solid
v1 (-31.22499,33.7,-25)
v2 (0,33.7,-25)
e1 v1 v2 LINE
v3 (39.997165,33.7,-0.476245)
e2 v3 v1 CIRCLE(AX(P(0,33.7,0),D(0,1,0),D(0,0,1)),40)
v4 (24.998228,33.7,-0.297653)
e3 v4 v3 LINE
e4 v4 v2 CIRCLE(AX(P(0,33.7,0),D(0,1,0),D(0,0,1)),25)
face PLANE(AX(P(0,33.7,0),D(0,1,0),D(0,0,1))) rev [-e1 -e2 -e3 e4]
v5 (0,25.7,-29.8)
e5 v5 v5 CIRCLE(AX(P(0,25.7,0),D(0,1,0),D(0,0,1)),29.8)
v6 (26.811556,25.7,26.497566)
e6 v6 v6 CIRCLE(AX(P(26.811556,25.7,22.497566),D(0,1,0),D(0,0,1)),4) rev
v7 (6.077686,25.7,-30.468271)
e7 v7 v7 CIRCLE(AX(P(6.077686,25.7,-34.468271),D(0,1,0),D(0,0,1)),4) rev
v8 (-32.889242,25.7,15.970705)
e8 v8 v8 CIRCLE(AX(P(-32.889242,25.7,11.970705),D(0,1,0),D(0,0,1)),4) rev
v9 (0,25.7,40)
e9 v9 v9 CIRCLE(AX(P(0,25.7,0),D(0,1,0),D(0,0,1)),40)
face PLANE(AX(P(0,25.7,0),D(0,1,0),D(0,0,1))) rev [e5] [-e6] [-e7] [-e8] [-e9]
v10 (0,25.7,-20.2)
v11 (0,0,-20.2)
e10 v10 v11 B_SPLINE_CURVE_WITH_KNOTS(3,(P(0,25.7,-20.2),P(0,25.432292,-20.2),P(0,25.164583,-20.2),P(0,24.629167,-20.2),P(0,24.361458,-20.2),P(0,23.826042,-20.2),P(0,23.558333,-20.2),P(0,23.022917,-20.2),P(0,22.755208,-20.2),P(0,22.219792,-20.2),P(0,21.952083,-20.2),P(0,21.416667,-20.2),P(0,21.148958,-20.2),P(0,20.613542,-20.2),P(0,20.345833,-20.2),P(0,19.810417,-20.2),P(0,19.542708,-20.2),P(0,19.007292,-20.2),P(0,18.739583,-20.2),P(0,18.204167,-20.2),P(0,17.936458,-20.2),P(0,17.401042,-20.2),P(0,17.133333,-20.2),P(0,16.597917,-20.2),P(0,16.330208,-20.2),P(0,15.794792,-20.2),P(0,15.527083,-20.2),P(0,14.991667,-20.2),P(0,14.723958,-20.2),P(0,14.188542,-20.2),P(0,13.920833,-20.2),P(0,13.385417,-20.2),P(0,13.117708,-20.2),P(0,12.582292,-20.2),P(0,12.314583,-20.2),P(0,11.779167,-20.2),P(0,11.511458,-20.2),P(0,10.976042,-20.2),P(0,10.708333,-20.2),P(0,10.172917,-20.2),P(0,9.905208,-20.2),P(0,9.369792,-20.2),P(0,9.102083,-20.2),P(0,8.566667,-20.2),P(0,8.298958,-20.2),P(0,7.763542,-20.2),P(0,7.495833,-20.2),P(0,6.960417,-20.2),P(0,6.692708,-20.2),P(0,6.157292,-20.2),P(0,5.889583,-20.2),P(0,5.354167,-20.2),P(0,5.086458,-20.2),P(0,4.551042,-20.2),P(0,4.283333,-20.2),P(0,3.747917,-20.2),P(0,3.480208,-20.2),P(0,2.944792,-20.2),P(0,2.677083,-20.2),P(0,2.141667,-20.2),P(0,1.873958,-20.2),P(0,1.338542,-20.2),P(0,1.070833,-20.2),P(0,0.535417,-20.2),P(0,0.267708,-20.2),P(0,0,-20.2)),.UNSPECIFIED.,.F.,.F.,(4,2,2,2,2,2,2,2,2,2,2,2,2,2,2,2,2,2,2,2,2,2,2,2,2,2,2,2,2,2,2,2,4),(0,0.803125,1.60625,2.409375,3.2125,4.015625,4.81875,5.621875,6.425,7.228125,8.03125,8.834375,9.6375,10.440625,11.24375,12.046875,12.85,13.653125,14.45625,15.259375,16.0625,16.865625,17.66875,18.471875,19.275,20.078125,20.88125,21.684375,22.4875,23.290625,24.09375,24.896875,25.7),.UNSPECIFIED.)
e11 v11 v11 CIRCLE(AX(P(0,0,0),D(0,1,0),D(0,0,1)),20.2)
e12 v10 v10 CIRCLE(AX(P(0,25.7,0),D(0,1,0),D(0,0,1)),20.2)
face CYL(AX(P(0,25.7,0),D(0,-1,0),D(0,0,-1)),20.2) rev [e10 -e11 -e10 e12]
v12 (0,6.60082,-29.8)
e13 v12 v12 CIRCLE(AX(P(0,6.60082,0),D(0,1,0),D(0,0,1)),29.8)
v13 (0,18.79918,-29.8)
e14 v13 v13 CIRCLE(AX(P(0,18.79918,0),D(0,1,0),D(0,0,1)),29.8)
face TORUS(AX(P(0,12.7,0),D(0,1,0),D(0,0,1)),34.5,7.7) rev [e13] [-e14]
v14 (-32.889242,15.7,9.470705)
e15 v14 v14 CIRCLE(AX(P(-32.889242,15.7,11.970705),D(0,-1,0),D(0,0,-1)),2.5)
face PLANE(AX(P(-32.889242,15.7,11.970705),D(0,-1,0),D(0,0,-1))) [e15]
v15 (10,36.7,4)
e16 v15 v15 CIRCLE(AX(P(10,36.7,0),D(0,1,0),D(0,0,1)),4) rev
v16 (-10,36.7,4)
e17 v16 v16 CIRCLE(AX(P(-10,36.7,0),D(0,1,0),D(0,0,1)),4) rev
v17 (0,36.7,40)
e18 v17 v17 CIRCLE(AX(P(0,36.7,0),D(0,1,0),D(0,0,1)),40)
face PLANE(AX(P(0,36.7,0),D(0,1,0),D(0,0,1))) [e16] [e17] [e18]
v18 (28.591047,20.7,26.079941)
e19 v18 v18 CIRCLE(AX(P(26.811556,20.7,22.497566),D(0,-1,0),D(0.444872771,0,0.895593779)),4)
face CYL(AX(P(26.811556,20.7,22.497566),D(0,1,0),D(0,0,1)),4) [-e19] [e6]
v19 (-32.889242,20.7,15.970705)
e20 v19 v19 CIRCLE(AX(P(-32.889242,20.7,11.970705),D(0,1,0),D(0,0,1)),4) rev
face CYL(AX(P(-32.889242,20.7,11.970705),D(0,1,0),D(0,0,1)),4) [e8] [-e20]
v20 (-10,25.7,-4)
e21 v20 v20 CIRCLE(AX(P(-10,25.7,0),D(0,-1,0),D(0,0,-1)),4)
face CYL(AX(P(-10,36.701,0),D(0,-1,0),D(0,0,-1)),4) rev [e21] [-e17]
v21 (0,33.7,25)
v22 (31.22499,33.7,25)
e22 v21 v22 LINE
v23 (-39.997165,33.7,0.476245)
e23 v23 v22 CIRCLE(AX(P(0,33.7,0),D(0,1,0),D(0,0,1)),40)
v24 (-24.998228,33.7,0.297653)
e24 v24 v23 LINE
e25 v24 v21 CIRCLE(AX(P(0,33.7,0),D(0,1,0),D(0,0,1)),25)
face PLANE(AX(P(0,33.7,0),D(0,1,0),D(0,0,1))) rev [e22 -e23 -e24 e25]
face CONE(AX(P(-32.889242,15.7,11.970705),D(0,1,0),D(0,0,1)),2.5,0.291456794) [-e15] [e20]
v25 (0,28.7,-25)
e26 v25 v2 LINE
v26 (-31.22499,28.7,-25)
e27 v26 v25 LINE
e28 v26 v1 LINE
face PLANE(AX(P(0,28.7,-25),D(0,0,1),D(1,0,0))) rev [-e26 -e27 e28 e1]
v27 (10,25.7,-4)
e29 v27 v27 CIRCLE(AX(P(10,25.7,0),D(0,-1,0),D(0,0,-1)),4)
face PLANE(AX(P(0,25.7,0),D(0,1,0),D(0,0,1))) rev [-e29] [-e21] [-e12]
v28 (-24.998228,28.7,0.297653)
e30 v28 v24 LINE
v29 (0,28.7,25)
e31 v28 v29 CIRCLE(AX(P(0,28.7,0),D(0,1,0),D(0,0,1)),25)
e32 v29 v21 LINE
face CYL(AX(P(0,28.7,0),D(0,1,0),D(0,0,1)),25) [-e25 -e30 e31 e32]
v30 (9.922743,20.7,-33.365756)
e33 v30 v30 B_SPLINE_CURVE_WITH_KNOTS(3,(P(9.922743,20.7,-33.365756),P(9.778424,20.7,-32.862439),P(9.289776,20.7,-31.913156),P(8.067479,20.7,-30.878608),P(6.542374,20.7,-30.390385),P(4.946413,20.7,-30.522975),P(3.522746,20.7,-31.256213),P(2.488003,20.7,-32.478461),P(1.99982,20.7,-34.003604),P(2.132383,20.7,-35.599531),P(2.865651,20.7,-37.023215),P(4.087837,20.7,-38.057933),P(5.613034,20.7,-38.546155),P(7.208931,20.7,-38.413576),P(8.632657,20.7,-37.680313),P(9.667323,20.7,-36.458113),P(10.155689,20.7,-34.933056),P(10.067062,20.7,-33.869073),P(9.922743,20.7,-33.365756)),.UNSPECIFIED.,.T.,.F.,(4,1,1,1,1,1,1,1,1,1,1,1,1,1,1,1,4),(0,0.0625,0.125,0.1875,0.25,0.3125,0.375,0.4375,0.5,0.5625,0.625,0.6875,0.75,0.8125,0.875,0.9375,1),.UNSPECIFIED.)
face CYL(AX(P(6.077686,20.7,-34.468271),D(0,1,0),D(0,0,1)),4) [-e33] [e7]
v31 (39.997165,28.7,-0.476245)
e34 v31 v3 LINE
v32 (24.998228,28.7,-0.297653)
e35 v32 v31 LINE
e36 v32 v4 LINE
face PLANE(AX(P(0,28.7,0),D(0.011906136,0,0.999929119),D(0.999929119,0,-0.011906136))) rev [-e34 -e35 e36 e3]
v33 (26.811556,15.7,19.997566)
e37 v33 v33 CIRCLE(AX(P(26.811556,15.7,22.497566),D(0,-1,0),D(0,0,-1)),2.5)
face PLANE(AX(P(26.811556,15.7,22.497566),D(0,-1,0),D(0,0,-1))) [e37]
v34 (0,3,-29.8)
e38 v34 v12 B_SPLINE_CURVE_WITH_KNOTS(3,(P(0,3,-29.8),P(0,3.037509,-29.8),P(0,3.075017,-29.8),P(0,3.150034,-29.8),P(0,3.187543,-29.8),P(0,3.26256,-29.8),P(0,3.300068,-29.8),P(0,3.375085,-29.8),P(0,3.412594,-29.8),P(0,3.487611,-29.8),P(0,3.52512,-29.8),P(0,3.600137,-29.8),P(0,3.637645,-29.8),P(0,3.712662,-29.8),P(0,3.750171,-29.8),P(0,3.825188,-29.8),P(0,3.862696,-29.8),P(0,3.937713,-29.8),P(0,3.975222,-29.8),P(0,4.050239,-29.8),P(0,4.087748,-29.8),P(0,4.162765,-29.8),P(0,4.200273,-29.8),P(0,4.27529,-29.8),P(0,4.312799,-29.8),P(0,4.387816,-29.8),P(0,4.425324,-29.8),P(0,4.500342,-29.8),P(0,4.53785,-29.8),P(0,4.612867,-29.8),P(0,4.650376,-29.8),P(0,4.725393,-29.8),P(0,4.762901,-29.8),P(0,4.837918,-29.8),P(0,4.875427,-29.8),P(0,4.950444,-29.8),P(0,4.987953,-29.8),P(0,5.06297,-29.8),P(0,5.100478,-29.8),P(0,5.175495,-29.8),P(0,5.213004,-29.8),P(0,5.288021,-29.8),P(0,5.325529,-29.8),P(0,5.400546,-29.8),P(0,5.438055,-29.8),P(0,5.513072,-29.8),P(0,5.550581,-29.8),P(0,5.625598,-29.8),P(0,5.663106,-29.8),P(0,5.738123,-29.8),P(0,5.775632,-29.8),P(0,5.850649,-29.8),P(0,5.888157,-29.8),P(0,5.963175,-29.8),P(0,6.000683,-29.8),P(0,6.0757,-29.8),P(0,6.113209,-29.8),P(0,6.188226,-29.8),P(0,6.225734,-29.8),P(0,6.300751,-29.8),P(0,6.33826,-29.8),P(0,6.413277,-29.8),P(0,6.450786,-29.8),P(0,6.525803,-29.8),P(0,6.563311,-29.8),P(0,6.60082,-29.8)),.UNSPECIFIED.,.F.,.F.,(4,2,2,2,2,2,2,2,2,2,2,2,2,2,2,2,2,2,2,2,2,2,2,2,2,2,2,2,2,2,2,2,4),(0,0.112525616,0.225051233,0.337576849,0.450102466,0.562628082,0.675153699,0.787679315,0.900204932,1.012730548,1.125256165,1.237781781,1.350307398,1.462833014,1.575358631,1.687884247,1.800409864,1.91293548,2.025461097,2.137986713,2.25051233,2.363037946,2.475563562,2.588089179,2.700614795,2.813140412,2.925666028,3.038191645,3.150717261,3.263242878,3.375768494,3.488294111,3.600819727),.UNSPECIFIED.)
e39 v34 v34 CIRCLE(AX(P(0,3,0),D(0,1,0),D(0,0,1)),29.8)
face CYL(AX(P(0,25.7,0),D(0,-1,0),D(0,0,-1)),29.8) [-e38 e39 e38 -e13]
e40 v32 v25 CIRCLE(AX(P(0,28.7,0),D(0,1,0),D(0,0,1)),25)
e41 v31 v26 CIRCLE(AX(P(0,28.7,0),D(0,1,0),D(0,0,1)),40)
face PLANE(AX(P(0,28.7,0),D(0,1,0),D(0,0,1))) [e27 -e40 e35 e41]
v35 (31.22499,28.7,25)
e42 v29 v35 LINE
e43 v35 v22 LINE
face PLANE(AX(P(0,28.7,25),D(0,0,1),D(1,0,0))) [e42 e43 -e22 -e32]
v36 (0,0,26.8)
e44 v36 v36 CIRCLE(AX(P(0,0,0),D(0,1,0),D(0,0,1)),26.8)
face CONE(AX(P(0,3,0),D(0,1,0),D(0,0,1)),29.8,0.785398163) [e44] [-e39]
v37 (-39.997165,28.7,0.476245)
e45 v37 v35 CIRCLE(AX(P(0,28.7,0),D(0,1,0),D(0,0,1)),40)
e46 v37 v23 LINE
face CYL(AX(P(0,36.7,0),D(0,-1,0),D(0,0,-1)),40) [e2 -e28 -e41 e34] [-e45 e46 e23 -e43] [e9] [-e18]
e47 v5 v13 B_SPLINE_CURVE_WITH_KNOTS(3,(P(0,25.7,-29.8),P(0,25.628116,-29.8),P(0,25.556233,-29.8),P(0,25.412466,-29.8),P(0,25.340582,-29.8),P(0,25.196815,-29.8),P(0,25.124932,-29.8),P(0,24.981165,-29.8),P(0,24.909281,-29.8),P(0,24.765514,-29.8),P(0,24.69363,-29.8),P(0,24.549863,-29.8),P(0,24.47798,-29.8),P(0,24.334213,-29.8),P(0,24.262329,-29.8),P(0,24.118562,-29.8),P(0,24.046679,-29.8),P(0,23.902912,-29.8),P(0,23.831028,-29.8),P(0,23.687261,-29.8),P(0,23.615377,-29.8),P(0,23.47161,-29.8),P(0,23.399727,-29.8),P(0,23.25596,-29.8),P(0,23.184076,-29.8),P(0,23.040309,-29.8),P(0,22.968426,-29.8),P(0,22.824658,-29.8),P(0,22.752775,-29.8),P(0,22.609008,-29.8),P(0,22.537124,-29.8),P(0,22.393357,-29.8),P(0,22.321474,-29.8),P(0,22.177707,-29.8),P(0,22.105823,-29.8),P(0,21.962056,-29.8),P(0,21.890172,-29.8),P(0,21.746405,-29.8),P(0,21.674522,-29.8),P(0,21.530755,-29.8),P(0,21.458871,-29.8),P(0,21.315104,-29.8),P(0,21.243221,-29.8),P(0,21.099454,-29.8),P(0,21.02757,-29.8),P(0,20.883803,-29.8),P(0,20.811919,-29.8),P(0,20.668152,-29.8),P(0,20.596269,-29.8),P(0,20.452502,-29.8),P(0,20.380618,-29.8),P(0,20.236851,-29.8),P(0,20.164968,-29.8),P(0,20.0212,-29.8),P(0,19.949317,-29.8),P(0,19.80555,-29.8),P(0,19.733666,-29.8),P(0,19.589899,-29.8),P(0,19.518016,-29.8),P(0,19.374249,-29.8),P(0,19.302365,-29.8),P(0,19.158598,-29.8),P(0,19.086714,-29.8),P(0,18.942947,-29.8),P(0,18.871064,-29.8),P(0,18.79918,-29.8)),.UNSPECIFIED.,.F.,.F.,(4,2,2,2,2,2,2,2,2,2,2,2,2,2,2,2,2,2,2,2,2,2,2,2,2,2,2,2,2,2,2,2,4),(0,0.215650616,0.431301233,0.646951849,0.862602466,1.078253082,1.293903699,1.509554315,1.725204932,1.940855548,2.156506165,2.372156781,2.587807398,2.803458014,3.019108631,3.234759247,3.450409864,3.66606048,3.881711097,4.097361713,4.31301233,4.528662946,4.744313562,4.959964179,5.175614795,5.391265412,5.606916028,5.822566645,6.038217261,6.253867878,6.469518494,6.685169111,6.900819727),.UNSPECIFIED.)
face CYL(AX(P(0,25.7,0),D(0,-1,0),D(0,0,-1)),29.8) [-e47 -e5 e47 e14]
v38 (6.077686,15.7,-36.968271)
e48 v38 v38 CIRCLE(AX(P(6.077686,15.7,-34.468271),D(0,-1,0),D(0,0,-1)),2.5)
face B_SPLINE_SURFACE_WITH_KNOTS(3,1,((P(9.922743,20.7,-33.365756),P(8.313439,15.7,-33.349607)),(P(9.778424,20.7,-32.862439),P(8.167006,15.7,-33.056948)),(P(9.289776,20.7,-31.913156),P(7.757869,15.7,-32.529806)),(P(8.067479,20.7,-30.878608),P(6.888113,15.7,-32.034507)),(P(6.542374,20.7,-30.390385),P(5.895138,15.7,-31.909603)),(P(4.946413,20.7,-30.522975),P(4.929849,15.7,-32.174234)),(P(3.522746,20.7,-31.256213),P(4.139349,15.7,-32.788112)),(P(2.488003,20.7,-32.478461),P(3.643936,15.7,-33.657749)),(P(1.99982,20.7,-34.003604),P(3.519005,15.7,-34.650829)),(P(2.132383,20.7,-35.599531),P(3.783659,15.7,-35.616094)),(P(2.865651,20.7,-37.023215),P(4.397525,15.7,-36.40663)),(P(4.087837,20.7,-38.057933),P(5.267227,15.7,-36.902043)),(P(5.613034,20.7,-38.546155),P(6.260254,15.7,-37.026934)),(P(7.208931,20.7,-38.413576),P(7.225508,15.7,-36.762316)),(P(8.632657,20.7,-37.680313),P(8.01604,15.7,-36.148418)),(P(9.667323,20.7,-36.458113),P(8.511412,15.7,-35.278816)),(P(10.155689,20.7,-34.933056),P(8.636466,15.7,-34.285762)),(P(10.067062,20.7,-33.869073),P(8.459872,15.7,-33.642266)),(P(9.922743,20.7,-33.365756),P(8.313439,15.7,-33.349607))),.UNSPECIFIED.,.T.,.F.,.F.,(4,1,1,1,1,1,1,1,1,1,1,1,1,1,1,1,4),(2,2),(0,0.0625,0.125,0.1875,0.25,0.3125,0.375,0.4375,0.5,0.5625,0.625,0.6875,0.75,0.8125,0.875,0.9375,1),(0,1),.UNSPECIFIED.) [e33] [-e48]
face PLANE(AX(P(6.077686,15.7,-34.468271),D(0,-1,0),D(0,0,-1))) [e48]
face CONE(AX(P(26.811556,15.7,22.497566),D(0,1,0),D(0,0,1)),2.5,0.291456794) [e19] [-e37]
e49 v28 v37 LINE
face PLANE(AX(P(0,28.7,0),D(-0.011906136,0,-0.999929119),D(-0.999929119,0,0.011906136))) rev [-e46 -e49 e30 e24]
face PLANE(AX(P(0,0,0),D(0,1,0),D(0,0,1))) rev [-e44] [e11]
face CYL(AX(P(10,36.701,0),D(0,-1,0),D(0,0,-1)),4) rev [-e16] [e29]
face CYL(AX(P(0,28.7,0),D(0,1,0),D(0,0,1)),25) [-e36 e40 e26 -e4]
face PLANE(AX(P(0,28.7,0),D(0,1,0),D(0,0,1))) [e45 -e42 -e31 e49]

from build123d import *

# Parameters (mm, degrees)
SKETCH1_R           = 29.8
SKETCH1_R_2         = 20.2
BOSS_EXTRUDE1_DEPTH = 25.7
SKETCH3_R           = 40
BOSS_EXTRUDE2_DEPTH = 11
SKETCH4_R           = 4
BOSS_EXTRUDE3_DEPTH = 5
SKETCH6_R           = 2.5
CUT_EXTRUDE1_START  = -8
CUT_EXTRUDE1_DEPTH  = 5
CUT_EXTRUDE2_REACH  = 64.133
SKETCH8_R           = 4


with BuildPart() as part:
    # Sketch1 → Boss-Extrude1 (new body)
    with BuildSketch(Plane(origin=(0, 0, 0), x_dir=(1, 0, 0), z_dir=(0, 1, 0))):
        with Locations(Location((0, 0, 0), (0, 0, 90))):
            Circle(SKETCH1_R)
        with Locations(Location((0, 0, 0), (0, 0, 90))):
            Circle(SKETCH1_R_2, mode=Mode.SUBTRACT)
    extrude(amount=BOSS_EXTRUDE1_DEPTH)

    # Sketch2 → Cut-Revolve1 (revolve, cut)
    with BuildSketch(Plane.XY, mode=Mode.PRIVATE) as cut_revolve1_sk:
        with BuildLine():
            Line((29.8, 12.7), (29.8, 18.799180273))
            ThreePointArc((29.8, 18.799180273), (27.590586132, 16.098529094), (26.8, 12.7))
            Line((26.8, 12.7), (29.8, 12.7))
        make_face()
        with BuildLine():
            Line((29.8, 6.600819727), (29.8, 12.7))
            Line((29.8, 12.7), (26.8, 12.7))
            ThreePointArc((26.8, 12.7), (27.590586132, 9.301470906), (29.8, 6.600819727))
        make_face()
        Polygon((29.8, 3), (26.8, 0), (29.8, 0), align=None)
    revolve(cut_revolve1_sk.sketch.rotate(Axis((0, 25.7, 0), (0, -1, 0)), 270), axis=Axis((0, 25.7, 0), (0, -1, 0)), mode=Mode.SUBTRACT)

    # Sketch3 → Boss-Extrude2 (add)
    with BuildSketch(Plane(origin=(0, 25.7, 0), x_dir=(1, 0, 0), z_dir=(0, 1, 0))):
        with Locations(Location((0, 0, 0), (0, 0, 270))):
            Circle(SKETCH3_R)
    extrude(amount=BOSS_EXTRUDE2_DEPTH)

    # Sketch4 → Boss-Extrude3 (add)
    with BuildSketch(Plane(origin=(0, 25.7, 0), x_dir=(-1, 0, 0), z_dir=(0, -1, 0))):
        with Locations(Location((-26.811555509, -22.497566339, 0), (0, 0, 270))):
            Circle(SKETCH4_R)
        with Locations(Location((32.889241728, -11.970705016, 0), (0, 0, 270))):
            Circle(SKETCH4_R)
        with Locations(Location((-6.077686218, 34.468271355, 0), (0, 0, 270))):
            Circle(SKETCH4_R)
    extrude(amount=BOSS_EXTRUDE3_DEPTH)

    # Sketch6 → section 1 of loft1
    with BuildSketch(Plane(origin=(0, 15.7, 0), x_dir=(-1, 0, 0), z_dir=(0, -1, 0)), mode=Mode.PRIVATE) as loft1_s1:
        with Locations((32.889241728, -11.970705016)):
            Circle(SKETCH6_R)
    # loft from a face of the part (loft1)
    loft([part.faces().sort_by_distance((-32.889241728, 20.7, 11.970705016))[0], loft1_s1.sketch])

    # Boundary1: read off the stored shape, not the designer's step
    # Boundary1 outline → Boundary1 (revolve)
    with BuildSketch(Plane(origin=(26.811555509, 0, 22.497566339), x_dir=(1, 0, 0), z_dir=(0, 0, 1))):
        Polygon((0, 20.7), (0, 15.7), (2.5, 15.7), (4, 20.7), align=None)
    revolve(axis=Axis((26.811555509, 0, 22.497566339), (0, 1, 0)))

    # Boundary2: read off the stored shape, not the designer's step
    # Boundary2: loft between two sections, ruled curve by curve
    boundary2_from = [
        Edge.make_bspline([(9.922742778, 20.7, -33.365756026), (9.778423859, 20.7, -32.862439299), (9.289775651, 20.7, -31.913155977), (8.067478825, 20.7, -30.878607721), (6.542374051, 20.7, -30.390384874), (4.946413374, 20.7, -30.522974824), (3.522746317, 20.7, -31.256212676), (2.488002725, 20.7, -32.478460941), (1.999820352, 20.7, -34.003603594), (2.132382571, 20.7, -35.599531113), (2.865650923, 20.7, -37.023214684), (4.087837179, 20.7, -38.057933438), (5.613033755, 20.7, -38.546155237), (7.208931107, 20.7, -38.413575903), (8.632657493, 20.7, -37.680313497), (9.667322676, 20.7, -36.45811299), (10.155689167, 20.7, -34.933056337), (10.067061697, 20.7, -33.869072752), (9.922742778, 20.7, -33.365756026)], [0, 0, 0, 0, 0.0625, 0.125, 0.1875, 0.25, 0.3125, 0.375, 0.4375, 0.5, 0.5625, 0.625, 0.6875, 0.75, 0.8125, 0.875, 0.9375, 1, 1, 1, 1], 3),
    ]
    boundary2_to = [
        Edge.make_bspline([(8.313438837, 15.7, -33.349606871), (8.167005998, 15.7, -33.056947538), (7.757868808, 15.7, -32.529805617), (6.88811309, 15.7, -32.034506513), (5.895137902, 15.7, -31.909602819), (4.929849468, 15.7, -32.174234081), (4.139348951, 15.7, -32.788112293), (3.643935799, 15.7, -33.657748526), (3.519005287, 15.7, -34.650828768), (3.783658552, 15.7, -35.616093907), (4.397524642, 15.7, -36.406629525), (5.26722668, 15.7, -36.902042852), (6.260254151, 15.7, -37.026934051), (7.225507947, 15.7, -36.762316146), (8.016039922, 15.7, -36.14841822), (8.511411727, 15.7, -35.27881634), (8.63646584, 15.7, -34.285761617), (8.459871676, 15.7, -33.642266205), (8.313438837, 15.7, -33.349606871)], [0, 0, 0, 0, 0.0625, 0.125, 0.1875, 0.25, 0.3125, 0.375, 0.4375, 0.5, 0.5625, 0.625, 0.6875, 0.75, 0.8125, 0.875, 0.9375, 1, 1, 1, 1], 3),
    ]
    boundary2 = Solid(Shell([*[Face.make_surface_from_curves(boundary2_from[k], boundary2_to[k]) for k in range(1)], Face(Wire(boundary2_from)), Face(Wire(boundary2_to))]))
    add(boundary2)

    # Sketch7 → Cut-Extrude1 (cut)
    with BuildSketch(Plane(origin=(0, 36.7, 0), x_dir=(1, 0, 0), z_dir=(0, 1, 0)).offset(CUT_EXTRUDE1_START)):
        with BuildLine():
            ThreePointArc((31.224989992, 25), (0, 40), (-31.224989992, 25))
            Line((-31.224989992, 25), (0, 25))
            Line((0, 25), (31.224989992, 25))
        make_face()
        with BuildLine():
            Line((-5.8e-08, -25), (-31.224989992, -25))
            ThreePointArc((-31.224989992, -25), (0, -40), (31.224989992, -25))
            Line((31.224989992, -25), (-5.8e-08, -25))
        make_face()
        with BuildLine():
            Line((-19.515618745, -15.625), (-31.224989992, -25))
            Line((-31.224989992, -25), (-5.8e-08, -25))
            ThreePointArc((-5.8e-08, -25), (-10.825317574, -22.534695459), (-19.515618745, -15.625))
        make_face()
        with BuildLine():
            Line((-24.998227986, -0.297653397), (-39.997164778, -0.476245435))
            ThreePointArc((-39.997164778, -0.476245435), (-37.663011922, -13.472102025), (-31.224989992, -25))
            Line((-31.224989992, -25), (-19.515618745, -15.625))
            ThreePointArc((-19.515618745, -15.625), (-23.539382451, -8.420063766), (-24.998227986, -0.297653397))
        make_face()
        with BuildLine():
            ThreePointArc((39.997164778, 0.476245435), (37.663011922, 13.472102025), (31.224989992, 25))
            Line((31.224989992, 25), (19.515618745, 15.625))
            ThreePointArc((19.515618745, 15.625), (23.539382451, 8.420063766), (24.998227986, 0.297653397))
            Line((24.998227986, 0.297653397), (39.997164778, 0.476245435))
        make_face()
        with BuildLine():
            Line((31.224989992, 25), (0, 25))
            ThreePointArc((0, 25), (10.825317547, 22.534695472), (19.515618745, 15.625))
            Line((19.515618745, 15.625), (31.224989992, 25))
        make_face()
    extrude(amount=CUT_EXTRUDE1_DEPTH, mode=Mode.SUBTRACT)

    # Sketch8 → Cut-Extrude2 (cut, up to next)
    with BuildSketch(Plane(origin=(0, 25.7, 0), x_dir=(-1, 0, 0), z_dir=(0, -1, 0)), mode=Mode.PRIVATE) as cut_extrude2_sk1:
        with Locations(Location((-10, 0, 0), (0, 0, 90))):
            Circle(SKETCH8_R)
    cut_extrude2_tool1 = extrude(cut_extrude2_sk1.sketch, amount=-CUT_EXTRUDE2_REACH, mode=Mode.PRIVATE) & part.part
    # Sketch8 → Cut-Extrude2 (cut, up to next)
    with BuildSketch(Plane(origin=(0, 25.7, 0), x_dir=(-1, 0, 0), z_dir=(0, -1, 0)), mode=Mode.PRIVATE) as cut_extrude2_sk2:
        with Locations(Location((10, 0, 0), (0, 0, 90))):
            Circle(SKETCH8_R)
    cut_extrude2_tool2 = extrude(cut_extrude2_sk2.sketch, amount=-CUT_EXTRUDE2_REACH, mode=Mode.PRIVATE) & part.part
    add(cut_extrude2_tool1.solids().sort_by_distance((10, 25.7, 0))[0], mode=Mode.SUBTRACT)
    add(cut_extrude2_tool2.solids().sort_by_distance((-10, 25.7, 0))[0], mode=Mode.SUBTRACT)


solid = part.part
